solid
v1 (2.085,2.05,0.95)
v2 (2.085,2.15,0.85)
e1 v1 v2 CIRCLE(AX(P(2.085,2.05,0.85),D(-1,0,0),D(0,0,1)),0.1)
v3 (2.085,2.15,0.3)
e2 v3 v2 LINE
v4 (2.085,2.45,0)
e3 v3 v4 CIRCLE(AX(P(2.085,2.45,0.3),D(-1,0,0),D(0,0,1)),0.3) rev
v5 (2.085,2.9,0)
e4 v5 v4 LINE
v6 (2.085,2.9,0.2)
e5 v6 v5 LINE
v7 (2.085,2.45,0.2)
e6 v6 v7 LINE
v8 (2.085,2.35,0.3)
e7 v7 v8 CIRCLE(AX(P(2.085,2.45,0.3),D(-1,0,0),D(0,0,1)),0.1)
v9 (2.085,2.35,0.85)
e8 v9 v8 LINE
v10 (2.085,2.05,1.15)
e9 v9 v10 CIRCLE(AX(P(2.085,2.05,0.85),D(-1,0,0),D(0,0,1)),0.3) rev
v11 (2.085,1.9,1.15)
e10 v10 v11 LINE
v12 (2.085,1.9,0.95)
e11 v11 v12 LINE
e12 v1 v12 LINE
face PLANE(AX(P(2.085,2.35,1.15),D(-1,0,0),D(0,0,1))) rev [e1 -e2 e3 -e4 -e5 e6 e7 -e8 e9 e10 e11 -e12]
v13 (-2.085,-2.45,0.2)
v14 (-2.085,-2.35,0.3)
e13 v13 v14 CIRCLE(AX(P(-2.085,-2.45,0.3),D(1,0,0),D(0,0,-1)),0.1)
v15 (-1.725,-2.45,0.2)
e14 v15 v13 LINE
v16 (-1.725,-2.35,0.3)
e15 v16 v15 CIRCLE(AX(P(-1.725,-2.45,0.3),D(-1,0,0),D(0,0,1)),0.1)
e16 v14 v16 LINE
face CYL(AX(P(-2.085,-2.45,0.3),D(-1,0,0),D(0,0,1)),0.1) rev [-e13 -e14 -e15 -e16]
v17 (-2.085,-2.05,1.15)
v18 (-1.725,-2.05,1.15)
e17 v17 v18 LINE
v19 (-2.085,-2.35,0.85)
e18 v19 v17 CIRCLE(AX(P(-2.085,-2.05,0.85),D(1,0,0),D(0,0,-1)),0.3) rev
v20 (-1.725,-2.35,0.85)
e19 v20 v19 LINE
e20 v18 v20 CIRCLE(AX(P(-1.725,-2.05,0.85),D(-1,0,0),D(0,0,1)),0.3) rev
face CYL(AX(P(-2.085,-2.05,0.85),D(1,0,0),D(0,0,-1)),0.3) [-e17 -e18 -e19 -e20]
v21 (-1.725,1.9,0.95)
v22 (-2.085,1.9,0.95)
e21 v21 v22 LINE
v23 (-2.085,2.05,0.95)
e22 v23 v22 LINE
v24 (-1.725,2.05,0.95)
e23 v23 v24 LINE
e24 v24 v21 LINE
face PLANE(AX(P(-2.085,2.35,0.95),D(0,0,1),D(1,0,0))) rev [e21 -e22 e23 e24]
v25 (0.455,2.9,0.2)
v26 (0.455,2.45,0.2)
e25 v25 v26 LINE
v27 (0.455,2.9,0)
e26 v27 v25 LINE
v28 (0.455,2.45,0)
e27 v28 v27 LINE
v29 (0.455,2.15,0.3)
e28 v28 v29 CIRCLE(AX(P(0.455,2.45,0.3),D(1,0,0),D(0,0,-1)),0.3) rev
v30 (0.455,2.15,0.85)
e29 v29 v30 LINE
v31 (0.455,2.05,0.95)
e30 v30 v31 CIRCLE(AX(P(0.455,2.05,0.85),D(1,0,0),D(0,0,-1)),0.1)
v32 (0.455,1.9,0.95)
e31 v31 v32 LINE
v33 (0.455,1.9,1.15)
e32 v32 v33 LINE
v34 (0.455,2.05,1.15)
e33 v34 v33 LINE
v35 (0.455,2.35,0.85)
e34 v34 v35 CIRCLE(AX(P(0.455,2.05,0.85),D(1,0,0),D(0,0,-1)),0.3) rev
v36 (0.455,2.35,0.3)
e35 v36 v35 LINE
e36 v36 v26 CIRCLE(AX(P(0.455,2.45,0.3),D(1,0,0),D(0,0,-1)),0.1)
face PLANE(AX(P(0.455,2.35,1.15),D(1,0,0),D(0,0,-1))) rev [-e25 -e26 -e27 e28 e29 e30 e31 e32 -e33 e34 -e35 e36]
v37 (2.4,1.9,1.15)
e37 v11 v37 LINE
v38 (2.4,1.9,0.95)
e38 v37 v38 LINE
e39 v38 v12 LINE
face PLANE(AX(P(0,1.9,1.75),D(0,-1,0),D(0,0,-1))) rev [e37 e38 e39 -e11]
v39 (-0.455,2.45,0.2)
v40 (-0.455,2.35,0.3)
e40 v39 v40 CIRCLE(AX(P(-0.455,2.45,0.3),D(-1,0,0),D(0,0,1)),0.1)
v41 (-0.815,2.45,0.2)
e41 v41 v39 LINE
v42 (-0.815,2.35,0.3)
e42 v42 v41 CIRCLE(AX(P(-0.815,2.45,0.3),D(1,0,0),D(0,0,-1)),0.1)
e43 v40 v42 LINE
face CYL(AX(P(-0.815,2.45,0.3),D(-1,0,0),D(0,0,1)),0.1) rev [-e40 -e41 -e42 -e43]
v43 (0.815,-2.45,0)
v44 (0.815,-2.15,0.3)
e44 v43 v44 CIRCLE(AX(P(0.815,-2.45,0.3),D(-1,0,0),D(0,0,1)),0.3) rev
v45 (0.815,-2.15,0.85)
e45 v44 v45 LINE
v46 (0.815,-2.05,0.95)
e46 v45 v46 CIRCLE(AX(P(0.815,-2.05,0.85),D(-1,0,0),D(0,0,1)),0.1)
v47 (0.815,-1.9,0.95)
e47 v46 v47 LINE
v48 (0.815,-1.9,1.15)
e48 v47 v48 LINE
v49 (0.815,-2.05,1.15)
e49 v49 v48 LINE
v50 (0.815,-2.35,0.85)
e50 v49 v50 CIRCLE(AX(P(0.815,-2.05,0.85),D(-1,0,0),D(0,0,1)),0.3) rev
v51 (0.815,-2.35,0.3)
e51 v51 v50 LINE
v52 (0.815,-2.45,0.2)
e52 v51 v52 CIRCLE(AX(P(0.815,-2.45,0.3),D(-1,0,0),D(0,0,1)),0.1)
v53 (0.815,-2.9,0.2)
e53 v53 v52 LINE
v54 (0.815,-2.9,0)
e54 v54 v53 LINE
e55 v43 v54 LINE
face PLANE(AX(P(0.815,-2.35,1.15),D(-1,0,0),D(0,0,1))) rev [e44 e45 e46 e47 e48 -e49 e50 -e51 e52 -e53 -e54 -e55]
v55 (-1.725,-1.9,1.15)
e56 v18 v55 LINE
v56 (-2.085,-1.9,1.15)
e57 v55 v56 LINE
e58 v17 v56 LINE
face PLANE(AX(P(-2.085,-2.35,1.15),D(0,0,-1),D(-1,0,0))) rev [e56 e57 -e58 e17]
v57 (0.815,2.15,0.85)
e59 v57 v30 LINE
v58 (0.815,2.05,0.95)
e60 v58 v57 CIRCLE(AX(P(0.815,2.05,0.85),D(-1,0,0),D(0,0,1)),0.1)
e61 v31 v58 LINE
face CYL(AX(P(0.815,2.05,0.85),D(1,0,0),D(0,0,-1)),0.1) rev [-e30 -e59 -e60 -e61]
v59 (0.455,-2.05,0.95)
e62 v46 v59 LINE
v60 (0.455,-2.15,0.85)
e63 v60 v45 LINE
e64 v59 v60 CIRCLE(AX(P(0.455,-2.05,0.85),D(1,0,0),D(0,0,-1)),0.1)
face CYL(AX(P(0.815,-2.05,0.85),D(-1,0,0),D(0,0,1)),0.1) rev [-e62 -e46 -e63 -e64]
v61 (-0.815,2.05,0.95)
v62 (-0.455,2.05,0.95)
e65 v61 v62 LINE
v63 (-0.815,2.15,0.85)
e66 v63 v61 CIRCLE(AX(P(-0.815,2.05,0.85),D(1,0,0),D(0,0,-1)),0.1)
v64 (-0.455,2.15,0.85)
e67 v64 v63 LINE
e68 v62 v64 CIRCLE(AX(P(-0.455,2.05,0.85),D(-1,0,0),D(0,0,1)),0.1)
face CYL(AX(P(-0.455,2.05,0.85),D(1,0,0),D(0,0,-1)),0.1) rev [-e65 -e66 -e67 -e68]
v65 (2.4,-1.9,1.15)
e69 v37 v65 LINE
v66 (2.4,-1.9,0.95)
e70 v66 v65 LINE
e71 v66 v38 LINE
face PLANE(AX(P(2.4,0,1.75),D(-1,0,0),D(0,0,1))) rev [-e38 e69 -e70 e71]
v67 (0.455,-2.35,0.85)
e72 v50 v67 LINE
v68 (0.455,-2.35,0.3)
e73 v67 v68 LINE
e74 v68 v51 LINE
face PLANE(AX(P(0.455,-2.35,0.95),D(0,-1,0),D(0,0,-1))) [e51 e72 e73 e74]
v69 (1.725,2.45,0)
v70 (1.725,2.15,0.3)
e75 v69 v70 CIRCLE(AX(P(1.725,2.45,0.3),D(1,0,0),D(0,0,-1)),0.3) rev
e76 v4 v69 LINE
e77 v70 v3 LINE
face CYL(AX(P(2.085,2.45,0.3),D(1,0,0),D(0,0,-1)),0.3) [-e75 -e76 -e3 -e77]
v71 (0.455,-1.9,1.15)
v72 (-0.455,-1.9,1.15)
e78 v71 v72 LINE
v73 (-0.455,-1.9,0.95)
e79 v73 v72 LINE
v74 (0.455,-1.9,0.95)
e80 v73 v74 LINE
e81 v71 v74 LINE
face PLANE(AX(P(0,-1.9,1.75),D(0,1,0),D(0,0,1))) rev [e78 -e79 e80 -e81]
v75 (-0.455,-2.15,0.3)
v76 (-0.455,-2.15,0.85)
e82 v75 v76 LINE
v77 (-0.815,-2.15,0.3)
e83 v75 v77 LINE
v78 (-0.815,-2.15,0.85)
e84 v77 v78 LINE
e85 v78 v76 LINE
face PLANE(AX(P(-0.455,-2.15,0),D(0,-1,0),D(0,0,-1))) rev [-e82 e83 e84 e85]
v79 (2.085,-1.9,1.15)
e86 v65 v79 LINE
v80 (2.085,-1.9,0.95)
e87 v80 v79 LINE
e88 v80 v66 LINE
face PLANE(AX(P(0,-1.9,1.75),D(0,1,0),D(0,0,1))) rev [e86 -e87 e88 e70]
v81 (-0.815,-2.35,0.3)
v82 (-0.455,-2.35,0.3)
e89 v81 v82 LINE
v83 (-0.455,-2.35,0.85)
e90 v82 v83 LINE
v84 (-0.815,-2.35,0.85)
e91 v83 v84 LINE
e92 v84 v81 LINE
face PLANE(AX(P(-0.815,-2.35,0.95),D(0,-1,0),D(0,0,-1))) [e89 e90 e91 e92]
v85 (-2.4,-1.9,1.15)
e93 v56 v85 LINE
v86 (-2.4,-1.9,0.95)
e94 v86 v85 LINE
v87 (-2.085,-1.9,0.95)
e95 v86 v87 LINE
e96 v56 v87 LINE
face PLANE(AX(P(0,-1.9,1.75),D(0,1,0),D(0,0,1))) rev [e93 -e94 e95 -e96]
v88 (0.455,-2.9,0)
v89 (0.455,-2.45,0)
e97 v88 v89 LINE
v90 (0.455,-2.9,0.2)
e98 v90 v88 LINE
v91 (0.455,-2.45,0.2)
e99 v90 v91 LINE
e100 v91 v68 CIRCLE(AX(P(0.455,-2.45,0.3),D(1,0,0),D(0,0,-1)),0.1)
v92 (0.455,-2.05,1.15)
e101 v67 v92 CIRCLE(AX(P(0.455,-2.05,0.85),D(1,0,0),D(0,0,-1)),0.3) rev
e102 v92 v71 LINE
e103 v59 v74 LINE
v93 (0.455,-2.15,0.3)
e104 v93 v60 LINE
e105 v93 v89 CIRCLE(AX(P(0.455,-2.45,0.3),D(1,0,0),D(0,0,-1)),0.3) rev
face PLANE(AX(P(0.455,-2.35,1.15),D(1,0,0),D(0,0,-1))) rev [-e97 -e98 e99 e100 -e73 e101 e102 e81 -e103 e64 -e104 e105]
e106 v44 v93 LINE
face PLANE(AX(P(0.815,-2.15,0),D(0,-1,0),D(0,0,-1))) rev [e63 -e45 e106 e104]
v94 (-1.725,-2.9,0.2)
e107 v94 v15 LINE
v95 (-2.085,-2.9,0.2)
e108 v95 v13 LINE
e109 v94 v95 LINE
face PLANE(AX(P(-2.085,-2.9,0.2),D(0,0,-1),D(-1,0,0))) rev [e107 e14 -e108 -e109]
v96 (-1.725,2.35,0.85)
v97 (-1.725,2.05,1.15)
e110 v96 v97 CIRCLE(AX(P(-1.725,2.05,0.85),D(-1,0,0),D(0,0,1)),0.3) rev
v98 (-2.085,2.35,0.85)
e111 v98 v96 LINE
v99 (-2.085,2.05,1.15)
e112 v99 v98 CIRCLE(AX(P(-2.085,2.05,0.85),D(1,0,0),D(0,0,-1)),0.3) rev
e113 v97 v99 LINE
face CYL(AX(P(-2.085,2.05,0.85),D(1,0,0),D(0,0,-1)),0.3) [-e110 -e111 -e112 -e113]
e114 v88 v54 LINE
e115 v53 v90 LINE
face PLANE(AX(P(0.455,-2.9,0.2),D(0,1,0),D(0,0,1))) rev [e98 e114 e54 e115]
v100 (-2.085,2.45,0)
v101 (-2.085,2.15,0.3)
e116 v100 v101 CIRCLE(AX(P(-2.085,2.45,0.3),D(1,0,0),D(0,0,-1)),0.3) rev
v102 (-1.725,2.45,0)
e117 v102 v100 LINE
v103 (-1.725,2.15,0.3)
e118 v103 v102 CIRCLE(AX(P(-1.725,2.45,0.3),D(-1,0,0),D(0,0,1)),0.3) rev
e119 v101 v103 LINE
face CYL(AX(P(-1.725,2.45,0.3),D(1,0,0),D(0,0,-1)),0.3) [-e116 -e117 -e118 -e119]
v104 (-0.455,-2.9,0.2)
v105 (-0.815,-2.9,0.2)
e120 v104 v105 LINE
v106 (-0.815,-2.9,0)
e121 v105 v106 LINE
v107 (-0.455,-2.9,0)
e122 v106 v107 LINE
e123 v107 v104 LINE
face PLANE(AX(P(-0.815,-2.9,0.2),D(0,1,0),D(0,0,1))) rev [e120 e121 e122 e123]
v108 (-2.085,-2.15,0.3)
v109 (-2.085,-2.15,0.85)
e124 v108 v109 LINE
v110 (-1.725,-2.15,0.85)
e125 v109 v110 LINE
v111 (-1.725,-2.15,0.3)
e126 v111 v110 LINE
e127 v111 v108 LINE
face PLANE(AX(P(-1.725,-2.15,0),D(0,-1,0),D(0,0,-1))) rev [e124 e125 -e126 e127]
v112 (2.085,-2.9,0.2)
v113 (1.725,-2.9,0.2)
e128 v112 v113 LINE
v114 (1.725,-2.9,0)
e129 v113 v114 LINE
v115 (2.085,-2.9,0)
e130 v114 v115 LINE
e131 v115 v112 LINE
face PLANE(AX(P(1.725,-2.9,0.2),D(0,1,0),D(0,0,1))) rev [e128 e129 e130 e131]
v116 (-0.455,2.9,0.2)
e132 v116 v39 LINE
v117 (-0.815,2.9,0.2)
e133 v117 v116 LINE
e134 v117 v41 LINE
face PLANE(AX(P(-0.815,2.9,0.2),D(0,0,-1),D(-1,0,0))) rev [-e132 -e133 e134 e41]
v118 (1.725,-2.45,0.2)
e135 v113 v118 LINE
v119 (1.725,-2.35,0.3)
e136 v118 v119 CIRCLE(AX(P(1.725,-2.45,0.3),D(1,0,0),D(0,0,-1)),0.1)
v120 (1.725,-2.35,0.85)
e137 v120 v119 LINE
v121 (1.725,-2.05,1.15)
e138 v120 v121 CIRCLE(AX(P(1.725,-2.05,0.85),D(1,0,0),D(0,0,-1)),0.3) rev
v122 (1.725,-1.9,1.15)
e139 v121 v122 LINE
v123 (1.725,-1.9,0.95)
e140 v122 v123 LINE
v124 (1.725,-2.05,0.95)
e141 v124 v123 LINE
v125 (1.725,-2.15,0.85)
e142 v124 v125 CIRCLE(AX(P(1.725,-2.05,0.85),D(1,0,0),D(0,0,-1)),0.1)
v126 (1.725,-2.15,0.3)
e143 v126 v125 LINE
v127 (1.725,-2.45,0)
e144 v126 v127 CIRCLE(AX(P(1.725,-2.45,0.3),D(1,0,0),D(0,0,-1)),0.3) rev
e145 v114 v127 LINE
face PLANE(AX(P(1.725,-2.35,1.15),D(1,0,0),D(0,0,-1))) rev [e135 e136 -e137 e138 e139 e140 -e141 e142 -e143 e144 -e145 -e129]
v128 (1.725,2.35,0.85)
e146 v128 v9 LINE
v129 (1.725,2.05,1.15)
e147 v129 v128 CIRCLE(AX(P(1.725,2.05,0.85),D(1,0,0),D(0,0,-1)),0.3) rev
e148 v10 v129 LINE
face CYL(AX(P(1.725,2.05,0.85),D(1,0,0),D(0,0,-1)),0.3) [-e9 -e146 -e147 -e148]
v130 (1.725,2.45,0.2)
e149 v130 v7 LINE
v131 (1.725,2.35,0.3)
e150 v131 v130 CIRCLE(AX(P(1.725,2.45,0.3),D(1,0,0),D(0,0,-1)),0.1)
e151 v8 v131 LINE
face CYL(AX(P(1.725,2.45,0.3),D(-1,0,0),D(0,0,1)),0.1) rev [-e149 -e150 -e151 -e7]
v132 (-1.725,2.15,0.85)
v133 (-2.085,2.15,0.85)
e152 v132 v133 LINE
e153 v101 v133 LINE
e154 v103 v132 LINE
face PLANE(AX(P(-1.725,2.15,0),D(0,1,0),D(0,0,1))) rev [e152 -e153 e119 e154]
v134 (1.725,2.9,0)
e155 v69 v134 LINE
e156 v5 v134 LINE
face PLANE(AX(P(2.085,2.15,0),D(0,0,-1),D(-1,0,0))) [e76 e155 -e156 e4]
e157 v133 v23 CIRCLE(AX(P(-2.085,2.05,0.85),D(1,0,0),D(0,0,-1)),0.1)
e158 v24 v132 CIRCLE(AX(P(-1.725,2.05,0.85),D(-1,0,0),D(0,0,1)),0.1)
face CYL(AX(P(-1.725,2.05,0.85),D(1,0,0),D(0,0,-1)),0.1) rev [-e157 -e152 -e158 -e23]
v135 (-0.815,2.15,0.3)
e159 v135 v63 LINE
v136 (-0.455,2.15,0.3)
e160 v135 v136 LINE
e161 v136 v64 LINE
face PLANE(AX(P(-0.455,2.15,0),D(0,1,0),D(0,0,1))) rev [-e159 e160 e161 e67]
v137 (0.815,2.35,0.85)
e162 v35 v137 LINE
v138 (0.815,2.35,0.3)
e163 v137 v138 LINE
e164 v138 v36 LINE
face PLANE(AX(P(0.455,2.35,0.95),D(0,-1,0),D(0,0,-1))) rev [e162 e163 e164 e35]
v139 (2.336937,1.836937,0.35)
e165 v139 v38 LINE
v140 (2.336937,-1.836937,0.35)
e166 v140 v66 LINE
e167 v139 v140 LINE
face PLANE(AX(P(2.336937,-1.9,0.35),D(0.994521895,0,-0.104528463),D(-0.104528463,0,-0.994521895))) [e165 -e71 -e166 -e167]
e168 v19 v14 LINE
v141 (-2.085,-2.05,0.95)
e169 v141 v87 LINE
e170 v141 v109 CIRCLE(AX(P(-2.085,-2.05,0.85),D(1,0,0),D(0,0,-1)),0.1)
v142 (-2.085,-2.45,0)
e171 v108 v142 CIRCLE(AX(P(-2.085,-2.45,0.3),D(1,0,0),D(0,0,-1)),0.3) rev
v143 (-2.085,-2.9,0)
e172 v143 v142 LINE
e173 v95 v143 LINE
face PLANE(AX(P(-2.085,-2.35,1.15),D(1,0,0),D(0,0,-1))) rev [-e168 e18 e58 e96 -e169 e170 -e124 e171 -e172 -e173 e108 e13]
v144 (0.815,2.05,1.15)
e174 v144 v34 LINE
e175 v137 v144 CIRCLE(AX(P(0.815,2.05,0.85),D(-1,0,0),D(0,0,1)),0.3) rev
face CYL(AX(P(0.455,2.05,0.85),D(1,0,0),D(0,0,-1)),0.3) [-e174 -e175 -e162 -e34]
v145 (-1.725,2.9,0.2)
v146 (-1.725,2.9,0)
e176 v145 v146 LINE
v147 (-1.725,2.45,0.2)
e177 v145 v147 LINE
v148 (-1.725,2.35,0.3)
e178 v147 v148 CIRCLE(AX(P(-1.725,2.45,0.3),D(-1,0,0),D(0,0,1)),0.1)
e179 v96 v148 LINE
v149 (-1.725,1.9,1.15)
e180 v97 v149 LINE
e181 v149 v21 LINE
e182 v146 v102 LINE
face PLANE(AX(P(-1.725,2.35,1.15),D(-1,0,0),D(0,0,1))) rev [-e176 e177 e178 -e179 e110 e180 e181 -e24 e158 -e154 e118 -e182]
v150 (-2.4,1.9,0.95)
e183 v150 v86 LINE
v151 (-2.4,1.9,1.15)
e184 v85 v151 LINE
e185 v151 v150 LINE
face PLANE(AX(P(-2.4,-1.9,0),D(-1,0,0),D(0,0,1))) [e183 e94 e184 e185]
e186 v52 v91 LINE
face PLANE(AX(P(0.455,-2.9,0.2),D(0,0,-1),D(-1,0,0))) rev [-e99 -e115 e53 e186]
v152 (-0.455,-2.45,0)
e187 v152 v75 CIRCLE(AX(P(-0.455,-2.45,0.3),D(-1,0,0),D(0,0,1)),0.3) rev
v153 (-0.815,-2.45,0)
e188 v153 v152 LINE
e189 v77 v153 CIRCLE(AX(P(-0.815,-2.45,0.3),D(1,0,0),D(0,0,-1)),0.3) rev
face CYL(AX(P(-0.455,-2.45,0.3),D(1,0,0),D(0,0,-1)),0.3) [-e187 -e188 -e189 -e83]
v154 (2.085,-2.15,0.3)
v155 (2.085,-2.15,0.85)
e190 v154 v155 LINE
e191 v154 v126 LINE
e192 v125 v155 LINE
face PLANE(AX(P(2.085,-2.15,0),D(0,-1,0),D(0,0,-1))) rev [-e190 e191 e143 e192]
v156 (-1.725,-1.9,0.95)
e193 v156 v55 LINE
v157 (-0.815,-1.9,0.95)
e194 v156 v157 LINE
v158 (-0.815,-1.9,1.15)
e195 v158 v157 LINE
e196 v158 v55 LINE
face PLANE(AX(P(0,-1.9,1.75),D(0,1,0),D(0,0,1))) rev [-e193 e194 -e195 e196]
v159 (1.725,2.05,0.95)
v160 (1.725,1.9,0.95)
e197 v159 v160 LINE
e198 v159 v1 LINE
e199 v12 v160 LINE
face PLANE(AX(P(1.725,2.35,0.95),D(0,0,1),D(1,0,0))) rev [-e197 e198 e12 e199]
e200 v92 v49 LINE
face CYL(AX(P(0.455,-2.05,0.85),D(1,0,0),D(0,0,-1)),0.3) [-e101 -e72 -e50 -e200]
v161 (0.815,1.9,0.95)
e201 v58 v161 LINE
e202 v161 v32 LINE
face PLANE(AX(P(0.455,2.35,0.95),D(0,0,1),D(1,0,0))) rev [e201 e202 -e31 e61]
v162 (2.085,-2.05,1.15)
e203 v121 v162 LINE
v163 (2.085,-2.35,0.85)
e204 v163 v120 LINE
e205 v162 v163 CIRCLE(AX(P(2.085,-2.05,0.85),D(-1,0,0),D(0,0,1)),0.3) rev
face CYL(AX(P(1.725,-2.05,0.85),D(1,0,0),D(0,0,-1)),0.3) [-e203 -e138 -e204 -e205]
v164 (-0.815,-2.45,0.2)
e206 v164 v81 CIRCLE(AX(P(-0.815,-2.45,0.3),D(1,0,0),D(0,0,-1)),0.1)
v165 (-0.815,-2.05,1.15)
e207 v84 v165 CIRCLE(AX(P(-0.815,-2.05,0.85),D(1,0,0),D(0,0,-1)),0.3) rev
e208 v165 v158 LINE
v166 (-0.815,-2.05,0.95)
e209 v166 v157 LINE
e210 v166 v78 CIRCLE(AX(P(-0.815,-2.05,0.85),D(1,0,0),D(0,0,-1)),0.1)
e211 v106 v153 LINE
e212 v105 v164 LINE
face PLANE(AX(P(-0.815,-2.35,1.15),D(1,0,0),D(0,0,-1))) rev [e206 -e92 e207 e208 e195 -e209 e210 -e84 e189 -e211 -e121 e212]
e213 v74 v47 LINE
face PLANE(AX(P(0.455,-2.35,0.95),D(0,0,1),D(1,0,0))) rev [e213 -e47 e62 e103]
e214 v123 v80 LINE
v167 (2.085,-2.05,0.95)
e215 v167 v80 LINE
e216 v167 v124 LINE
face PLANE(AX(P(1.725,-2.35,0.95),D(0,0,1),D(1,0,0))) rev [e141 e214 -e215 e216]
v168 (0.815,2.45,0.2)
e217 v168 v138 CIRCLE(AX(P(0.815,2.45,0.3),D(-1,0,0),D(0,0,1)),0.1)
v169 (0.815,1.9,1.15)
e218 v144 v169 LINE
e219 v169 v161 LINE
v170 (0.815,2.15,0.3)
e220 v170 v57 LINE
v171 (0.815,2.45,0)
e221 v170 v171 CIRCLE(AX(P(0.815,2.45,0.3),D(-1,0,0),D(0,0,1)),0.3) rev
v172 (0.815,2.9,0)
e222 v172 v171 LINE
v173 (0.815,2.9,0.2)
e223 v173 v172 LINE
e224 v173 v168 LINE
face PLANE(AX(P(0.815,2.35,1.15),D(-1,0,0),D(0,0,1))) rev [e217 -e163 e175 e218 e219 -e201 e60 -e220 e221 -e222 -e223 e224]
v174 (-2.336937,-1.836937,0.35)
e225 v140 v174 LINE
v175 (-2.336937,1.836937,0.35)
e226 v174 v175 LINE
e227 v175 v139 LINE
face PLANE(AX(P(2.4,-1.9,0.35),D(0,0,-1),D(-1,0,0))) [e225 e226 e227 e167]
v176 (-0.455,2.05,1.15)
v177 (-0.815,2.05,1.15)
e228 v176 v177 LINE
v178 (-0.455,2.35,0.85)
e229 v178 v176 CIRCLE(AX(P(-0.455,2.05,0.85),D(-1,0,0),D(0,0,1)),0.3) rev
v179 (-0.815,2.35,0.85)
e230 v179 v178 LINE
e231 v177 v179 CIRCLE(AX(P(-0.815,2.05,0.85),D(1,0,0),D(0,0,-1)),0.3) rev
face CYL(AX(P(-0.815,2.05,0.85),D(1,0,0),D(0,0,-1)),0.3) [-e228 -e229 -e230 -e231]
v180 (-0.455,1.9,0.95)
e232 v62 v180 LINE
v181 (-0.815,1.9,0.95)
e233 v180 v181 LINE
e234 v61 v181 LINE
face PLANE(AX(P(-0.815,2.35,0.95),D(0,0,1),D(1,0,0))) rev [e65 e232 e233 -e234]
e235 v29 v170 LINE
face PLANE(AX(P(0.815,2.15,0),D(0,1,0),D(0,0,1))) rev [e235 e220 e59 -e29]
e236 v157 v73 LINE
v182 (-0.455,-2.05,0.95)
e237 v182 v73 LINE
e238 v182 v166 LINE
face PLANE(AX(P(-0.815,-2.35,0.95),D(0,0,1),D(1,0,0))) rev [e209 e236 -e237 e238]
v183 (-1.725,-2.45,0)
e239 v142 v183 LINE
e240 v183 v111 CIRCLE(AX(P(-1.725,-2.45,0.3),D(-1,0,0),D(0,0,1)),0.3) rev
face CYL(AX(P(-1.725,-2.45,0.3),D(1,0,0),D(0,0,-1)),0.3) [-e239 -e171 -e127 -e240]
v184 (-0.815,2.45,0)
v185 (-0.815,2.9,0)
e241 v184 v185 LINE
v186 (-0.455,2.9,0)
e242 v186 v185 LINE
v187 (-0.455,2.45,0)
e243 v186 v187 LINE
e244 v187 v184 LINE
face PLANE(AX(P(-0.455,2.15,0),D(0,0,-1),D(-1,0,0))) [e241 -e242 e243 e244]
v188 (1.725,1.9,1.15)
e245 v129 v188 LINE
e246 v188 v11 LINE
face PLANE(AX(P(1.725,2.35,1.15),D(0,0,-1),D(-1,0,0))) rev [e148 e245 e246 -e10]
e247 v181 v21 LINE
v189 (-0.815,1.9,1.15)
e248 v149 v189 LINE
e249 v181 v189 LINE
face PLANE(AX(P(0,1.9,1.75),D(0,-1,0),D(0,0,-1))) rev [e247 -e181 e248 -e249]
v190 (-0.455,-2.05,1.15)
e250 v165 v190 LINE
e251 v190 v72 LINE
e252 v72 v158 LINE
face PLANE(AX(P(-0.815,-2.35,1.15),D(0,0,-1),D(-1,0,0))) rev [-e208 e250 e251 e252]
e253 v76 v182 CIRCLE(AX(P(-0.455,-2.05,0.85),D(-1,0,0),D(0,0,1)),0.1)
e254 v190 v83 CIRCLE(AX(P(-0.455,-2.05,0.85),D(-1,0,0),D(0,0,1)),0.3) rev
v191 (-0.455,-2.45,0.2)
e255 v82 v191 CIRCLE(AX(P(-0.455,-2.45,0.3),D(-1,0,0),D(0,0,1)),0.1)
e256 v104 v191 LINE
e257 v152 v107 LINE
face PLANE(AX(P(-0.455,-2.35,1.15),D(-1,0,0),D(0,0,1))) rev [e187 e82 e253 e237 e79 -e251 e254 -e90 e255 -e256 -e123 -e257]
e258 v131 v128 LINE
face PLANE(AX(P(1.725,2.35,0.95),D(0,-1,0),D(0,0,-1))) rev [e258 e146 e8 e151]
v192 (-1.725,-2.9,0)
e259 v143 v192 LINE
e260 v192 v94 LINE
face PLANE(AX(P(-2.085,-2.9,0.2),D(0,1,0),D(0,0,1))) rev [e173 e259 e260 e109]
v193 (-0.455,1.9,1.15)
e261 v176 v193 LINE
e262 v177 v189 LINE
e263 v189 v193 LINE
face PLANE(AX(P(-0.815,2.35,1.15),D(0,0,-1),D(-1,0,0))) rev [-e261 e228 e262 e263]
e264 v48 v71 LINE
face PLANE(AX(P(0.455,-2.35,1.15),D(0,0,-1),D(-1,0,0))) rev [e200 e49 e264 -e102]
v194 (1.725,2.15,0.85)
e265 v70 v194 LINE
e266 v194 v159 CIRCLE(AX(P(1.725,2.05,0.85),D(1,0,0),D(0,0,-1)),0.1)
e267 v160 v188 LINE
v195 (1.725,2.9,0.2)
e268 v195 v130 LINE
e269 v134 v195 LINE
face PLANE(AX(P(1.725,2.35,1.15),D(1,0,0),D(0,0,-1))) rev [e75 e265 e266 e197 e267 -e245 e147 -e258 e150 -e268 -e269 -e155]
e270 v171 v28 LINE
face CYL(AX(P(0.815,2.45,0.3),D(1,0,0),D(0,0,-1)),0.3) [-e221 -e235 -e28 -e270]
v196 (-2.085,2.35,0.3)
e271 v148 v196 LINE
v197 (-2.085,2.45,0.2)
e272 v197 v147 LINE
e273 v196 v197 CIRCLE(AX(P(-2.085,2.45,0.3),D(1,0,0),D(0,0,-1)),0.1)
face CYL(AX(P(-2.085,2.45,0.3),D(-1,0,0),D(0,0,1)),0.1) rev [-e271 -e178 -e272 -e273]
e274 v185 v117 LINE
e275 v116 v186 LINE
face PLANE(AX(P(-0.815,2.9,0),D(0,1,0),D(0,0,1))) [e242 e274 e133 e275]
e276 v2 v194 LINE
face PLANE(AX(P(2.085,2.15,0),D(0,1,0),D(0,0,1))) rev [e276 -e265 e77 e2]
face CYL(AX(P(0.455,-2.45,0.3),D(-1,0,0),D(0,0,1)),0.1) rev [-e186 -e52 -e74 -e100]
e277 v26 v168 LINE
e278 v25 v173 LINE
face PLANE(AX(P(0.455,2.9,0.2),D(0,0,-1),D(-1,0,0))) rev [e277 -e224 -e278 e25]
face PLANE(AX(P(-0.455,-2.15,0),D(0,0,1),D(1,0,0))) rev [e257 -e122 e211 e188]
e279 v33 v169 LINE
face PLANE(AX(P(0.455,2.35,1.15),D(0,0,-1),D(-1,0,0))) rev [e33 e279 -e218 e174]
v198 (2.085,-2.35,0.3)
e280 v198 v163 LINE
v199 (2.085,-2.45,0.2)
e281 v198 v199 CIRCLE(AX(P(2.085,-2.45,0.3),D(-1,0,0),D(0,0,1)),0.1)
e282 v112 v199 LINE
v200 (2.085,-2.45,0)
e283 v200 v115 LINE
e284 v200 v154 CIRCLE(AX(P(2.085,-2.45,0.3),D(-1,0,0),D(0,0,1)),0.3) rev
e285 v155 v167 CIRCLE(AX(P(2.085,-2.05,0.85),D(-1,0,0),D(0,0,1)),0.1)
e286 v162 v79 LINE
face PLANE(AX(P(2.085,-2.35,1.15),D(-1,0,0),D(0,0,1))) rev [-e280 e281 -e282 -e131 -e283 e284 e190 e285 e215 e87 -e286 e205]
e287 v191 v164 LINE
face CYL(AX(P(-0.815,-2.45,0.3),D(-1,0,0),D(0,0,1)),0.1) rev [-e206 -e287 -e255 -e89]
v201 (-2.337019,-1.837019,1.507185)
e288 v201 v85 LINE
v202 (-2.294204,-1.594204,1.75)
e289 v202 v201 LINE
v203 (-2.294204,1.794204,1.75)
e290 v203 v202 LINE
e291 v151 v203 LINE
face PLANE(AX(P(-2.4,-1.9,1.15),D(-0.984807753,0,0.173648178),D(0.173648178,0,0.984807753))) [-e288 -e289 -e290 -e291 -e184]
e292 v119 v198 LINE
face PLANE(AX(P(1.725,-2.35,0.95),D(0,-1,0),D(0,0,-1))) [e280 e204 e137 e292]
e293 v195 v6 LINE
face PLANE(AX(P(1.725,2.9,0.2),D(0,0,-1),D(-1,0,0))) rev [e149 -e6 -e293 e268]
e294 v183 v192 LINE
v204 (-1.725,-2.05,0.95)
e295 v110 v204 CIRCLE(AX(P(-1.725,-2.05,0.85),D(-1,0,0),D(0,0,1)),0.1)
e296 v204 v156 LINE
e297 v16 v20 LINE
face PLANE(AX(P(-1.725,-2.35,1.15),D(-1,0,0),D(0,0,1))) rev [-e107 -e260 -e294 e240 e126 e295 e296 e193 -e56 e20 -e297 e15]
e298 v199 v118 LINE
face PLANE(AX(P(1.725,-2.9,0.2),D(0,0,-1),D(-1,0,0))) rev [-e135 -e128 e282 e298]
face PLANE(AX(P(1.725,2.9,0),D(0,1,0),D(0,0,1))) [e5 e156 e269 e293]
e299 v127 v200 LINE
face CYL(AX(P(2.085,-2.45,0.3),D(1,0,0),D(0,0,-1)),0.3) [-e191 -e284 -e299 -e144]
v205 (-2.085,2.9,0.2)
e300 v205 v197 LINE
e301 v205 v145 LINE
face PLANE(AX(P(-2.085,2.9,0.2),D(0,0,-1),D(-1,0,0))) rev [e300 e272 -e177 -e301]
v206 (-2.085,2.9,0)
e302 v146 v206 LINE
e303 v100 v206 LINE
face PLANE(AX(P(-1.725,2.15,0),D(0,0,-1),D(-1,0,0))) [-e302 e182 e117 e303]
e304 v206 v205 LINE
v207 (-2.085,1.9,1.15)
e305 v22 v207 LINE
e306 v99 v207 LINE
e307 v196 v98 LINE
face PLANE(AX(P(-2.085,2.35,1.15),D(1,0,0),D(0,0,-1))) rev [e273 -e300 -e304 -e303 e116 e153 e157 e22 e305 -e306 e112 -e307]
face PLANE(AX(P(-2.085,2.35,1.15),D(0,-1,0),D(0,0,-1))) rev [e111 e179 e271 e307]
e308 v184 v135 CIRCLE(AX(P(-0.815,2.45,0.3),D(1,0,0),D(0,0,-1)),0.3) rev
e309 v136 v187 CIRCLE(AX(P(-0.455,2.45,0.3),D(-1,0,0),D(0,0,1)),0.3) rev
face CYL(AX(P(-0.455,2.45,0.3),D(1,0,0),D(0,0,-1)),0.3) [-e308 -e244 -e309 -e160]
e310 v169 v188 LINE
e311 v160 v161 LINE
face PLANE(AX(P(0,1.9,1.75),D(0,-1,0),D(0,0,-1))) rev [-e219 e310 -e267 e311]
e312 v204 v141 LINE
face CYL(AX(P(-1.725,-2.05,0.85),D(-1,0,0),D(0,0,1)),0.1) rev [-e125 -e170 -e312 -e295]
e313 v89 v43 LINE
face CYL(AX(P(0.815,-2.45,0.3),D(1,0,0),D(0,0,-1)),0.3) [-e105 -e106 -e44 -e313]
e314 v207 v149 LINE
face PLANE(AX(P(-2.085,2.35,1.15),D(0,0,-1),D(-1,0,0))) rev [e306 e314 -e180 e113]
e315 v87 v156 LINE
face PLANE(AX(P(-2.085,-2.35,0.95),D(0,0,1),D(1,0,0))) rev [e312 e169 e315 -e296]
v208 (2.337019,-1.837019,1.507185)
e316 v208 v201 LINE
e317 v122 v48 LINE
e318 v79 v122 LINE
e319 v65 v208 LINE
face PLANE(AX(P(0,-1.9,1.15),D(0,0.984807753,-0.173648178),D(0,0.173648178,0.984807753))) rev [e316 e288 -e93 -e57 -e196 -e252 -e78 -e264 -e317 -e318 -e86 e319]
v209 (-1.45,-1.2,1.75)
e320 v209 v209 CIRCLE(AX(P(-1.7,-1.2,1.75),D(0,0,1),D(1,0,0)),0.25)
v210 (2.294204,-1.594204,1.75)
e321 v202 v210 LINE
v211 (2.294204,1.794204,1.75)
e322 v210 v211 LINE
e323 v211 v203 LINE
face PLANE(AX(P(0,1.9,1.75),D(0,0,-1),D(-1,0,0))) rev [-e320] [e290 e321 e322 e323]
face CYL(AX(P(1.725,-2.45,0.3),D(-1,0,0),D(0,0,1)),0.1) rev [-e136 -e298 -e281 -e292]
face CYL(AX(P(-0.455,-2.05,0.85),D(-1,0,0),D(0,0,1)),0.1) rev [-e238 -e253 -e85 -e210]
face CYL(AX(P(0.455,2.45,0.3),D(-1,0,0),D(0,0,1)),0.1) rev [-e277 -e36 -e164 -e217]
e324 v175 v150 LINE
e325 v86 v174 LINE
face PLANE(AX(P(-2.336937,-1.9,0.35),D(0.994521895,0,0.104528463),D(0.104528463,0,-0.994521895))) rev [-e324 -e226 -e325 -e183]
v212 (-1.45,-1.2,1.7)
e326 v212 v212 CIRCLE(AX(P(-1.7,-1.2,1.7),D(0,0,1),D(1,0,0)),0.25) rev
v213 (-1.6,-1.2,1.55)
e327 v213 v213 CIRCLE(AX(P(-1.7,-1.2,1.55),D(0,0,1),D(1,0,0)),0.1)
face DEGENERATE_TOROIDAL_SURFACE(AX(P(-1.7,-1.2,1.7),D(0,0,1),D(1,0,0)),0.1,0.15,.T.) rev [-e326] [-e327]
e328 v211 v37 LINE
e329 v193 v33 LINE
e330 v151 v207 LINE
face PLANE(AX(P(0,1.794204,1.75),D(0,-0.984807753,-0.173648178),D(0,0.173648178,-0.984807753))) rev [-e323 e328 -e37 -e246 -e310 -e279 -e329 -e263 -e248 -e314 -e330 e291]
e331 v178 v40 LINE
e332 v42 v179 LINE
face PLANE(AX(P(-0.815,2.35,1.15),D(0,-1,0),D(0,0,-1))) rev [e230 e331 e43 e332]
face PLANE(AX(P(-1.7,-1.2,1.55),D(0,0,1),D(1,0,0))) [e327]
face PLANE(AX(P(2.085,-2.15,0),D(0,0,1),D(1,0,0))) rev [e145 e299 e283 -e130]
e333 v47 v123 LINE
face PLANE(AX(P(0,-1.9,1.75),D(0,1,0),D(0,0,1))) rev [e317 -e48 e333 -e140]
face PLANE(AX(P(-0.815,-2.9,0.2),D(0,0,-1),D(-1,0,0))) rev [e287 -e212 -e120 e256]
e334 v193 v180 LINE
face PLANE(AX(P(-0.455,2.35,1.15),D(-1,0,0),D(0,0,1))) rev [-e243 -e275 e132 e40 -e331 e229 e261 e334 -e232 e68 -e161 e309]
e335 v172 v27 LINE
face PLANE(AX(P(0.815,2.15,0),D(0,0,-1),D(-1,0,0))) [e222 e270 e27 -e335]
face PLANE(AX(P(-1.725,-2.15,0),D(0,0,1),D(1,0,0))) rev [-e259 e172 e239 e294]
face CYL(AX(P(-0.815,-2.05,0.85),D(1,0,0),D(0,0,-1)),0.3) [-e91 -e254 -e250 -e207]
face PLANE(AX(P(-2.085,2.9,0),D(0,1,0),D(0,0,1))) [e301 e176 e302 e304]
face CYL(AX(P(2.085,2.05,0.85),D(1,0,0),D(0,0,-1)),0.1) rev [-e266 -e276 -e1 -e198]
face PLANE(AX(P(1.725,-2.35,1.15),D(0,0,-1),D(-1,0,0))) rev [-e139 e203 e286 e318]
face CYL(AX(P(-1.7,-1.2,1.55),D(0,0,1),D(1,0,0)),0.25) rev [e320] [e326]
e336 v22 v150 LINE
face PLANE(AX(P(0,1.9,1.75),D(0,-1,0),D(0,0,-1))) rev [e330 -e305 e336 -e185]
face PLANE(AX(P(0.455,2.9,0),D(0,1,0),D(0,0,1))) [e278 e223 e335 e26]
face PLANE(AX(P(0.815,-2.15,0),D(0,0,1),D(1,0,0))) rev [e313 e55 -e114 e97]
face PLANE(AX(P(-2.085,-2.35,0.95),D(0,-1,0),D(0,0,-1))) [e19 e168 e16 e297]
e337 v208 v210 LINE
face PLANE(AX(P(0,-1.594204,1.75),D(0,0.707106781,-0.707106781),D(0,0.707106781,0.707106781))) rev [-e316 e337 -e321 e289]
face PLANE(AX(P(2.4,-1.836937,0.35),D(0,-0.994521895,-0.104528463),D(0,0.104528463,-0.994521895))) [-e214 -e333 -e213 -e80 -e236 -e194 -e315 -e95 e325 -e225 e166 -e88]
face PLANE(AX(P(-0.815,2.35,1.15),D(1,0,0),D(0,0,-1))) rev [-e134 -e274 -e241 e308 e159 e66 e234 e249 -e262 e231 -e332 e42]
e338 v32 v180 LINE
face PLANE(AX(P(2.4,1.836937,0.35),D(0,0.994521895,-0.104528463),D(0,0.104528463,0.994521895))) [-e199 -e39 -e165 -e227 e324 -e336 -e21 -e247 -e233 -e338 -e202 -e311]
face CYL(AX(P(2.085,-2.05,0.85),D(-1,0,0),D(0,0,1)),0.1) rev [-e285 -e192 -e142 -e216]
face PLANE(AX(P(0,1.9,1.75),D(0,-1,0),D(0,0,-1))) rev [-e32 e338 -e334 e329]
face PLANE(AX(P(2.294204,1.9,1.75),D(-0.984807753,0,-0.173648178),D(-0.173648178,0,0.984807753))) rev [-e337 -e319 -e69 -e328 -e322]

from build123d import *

# Parameters (mm, degrees)
SZKIC1_W                   = 2.4
SZKIC1_H                   = 1.9
WYCI_GNI_CIE1_DEPTH        = 1.75
SZKIC2_W                   = 2.4
SZKIC2_H                   = 1.75
WYCI_GNI_CIE2_DEPTH        = 1.9
SZKIC3_W                   = 1.75
SZKIC3_H                   = 3.8
WYCI_GNI_CIE3_DEPTH        = 2.4
SFAZOWANIE1_SIZE           = 0.6
SFAZOWANIE1_SIZE2          = 0.105796188
SFAZOWANIE3_SIZE           = 0.2
SFAZOWANIE3_SIZE2          = 0.24656061
SFAZOWANIE4_SIZE           = 0.6
SFAZOWANIE4_SIZE2          = 0.105796188
SZKIC4_W                   = 0.36
SZKIC4_H                   = 0.2
WYCI_GNI_CIE4_DEPTH        = 0.45
SZKIC6_W                   = 0.36
SZKIC6_H                   = 0.2
WYCI_GNI_CIE5_DEPTH        = 0.95
SZKIC10_W                  = 0.36
SZKIC10_H                  = 0.2
WYCI_GNI_CIE6_DEPTH        = 0.45
SZKIC11_W                  = 0.36
SZKIC11_H                  = 0.2
WYCI_GNI_CIE7_DEPTH        = 0.95
SZKIC12_W                  = 4.8
SZKIC12_H                  = 3.8
WYTNIJ_WYCI_GNI_CIE3_DEPTH = 0.35
SFAZOWANIE6_SIZE           = 0.6
SFAZOWANIE6_SIZE_2         = 0.063062541
SFAZOWANIE7_SIZE           = 0.6
SFAZOWANIE7_SIZE2          = 0.063062541
SFAZOWANIE8_SIZE           = 0.6
SFAZOWANIE8_SIZE_2         = 0.063062541
SFAZOWANIE9_SIZE           = 0.6
SFAZOWANIE9_SIZE2          = 0.063062541
SFAZOWANIE10_SIZE          = 0.6
SFAZOWANIE10_SIZE2         = 0.105796188
SFAZOWANIE11_SIZE          = 0.6
SFAZOWANIE11_SIZE2         = 0.105796188
SZKIC13_W                  = 0.36
SZKIC13_H                  = 0.2
WYCI_GNI_CIE8_DEPTH        = 0.55
SZKIC14_W                  = 0.36
SZKIC14_H                  = 0.2
WYCI_GNI_CIE9_DEPTH        = 0.55
ZAOKR_GLENIE1_R            = 0.3
ZAOKR_GLENIE2_R            = 0.3
ZAOKR_GLENIE3_R            = 0.3
ZAOKR_GLENIE4_R            = 0.3
ZAOKR_GLENIE5_R            = 0.1
ZAOKR_GLENIE6_R            = 0.3
ZAOKR_GLENIE7_R            = 0.3
ZAOKR_GLENIE8_R            = 0.3
ZAOKR_GLENIE9_R            = 0.3
ZAOKR_GLENIE10_R           = 0.3
ZAOKR_GLENIE11_R           = 0.3
ZAOKR_GLENIE12_R           = 0.3
ZAOKR_GLENIE13_R           = 0.3
ZAOKR_GLENIE14_R           = 0.3
ZAOKR_GLENIE15_R           = 0.3
ZAOKR_GLENIE16_R           = 0.3
ZAOKR_GLENIE17_R           = 0.3
ZAOKR_GLENIE18_R           = 0.1
ZAOKR_GLENIE19_R           = 0.1
ZAOKR_GLENIE20_R           = 0.1
ZAOKR_GLENIE21_R           = 0.1
ZAOKR_GLENIE22_R           = 0.1
ZAOKR_GLENIE23_R           = 0.1
ZAOKR_GLENIE24_R           = 0.1
ZAOKR_GLENIE25_R           = 0.1
ZAOKR_GLENIE26_R           = 0.1
ZAOKR_GLENIE27_R           = 0.1
ZAOKR_GLENIE28_R           = 0.1
ZAOKR_GLENIE29_R           = 0.1
ZAOKR_GLENIE30_R           = 0.1
ZAOKR_GLENIE31_R           = 0.1
ZAOKR_GLENIE32_R           = 0.1
SZKIC15_R                  = 0.25
WYTNIJ_WYCI_GNI_CIE4_DEPTH = 0.2
ZAOKR_GLENIE33_R           = 0.15


with BuildPart() as part:
    # Szkic1 → Wyciągnięcie1 (new body)
    with BuildSketch(Plane.XY):
        with Locations((1.2, 0.95)):
            Rectangle(SZKIC1_W, SZKIC1_H)
    extrude(amount=WYCI_GNI_CIE1_DEPTH)

    # Szkic2 → Wyciągnięcie2 (add)
    with BuildSketch(Plane.XZ):
        with Locations((1.2, 0.875)):
            Rectangle(SZKIC2_W, SZKIC2_H)
    extrude(amount=WYCI_GNI_CIE2_DEPTH)

    # Szkic3 → Wyciągnięcie3 (add)
    with BuildSketch(Plane.ZY):
        with Locations((0.875, 0)):
            Rectangle(SZKIC3_W, SZKIC3_H)
    extrude(amount=WYCI_GNI_CIE3_DEPTH)

    # Sfazowanie1
    sfazowanie1_edges = [part.edges().sort_by_distance(p)[0] for p in [
        (0, -1.9, 1.75),
    ]]
    sfazowanie1_side = [part.faces().sort_by_distance(p)[0] for p in [
        (0, -1.9, 0.875),
    ]]
    chamfer(sfazowanie1_edges, length=SFAZOWANIE1_SIZE, length2=SFAZOWANIE1_SIZE2, reference=sfazowanie1_side[0])

    # Sfazowanie3
    sfazowanie3_edges = [part.edges().sort_by_distance(p)[0] for p in [
        (0, -1.794203812, 1.75),
    ]]
    sfazowanie3_side = [part.faces().sort_by_distance(p)[0] for p in [
        (0, 0.052898094, 1.75),
    ]]
    chamfer(sfazowanie3_edges, length=SFAZOWANIE3_SIZE, length2=SFAZOWANIE3_SIZE2, reference=sfazowanie3_side[0])

    # Sfazowanie4
    sfazowanie4_edges = [part.edges().sort_by_distance(p)[0] for p in [
        (0, 1.9, 1.75),
    ]]
    sfazowanie4_side = [part.faces().sort_by_distance(p)[0] for p in [
        (0, 1.9, 0.875),
    ]]
    chamfer(sfazowanie4_edges, length=SFAZOWANIE4_SIZE, length2=SFAZOWANIE4_SIZE2, reference=sfazowanie4_side[0])

    # Szkic4 → Wyciągnięcie4 (add)
    with BuildSketch(Plane.XZ.offset(1.9)):
        with Locations((-1.905, 1.05)):
            Rectangle(SZKIC4_W, SZKIC4_H)
        with Locations((-0.635, 1.05)):
            Rectangle(SZKIC4_W, SZKIC4_H)
        with Locations((0.635, 1.05)):
            Rectangle(SZKIC4_W, SZKIC4_H)
        with Locations((1.905, 1.05)):
            Rectangle(SZKIC4_W, SZKIC4_H)
    extrude(amount=WYCI_GNI_CIE4_DEPTH)

    # Szkic6 → Wyciągnięcie5 (add)
    with BuildSketch(Plane(origin=(0, 0, 0.95), x_dir=(-1, 0, 0), z_dir=(0, 0, -1))):
        with Locations((-1.905, -2.25)):
            Rectangle(SZKIC6_W, SZKIC6_H)
        with Locations((-0.635, -2.25)):
            Rectangle(SZKIC6_W, SZKIC6_H)
        with Locations((0.635, -2.25)):
            Rectangle(SZKIC6_W, SZKIC6_H)
        with Locations((1.905, -2.25)):
            Rectangle(SZKIC6_W, SZKIC6_H)
    extrude(amount=WYCI_GNI_CIE5_DEPTH)

    # Szkic10 → Wyciągnięcie6 (add)
    with BuildSketch(Plane(origin=(0, 1.9, 0), x_dir=(-1, 0, 0), z_dir=(0, 1, 0))):
        with Locations((1.905, 1.05)):
            Rectangle(SZKIC10_W, SZKIC10_H)
        with Locations((0.635, 1.05)):
            Rectangle(SZKIC10_W, SZKIC10_H)
        with Locations((-0.635, 1.05)):
            Rectangle(SZKIC10_W, SZKIC10_H)
        with Locations((-1.905, 1.05)):
            Rectangle(SZKIC10_W, SZKIC10_H)
    extrude(amount=WYCI_GNI_CIE6_DEPTH)

    # Szkic11 → Wyciągnięcie7 (add)
    with BuildSketch(Plane(origin=(0, 0, 0.95), x_dir=(-1, 0, 0), z_dir=(0, 0, -1))):
        with Locations((-1.905, 2.25)):
            Rectangle(SZKIC11_W, SZKIC11_H)
        with Locations((-0.635, 2.25)):
            Rectangle(SZKIC11_W, SZKIC11_H)
        with Locations((0.635, 2.25)):
            Rectangle(SZKIC11_W, SZKIC11_H)
        with Locations((1.905, 2.25)):
            Rectangle(SZKIC11_W, SZKIC11_H)
    extrude(amount=WYCI_GNI_CIE7_DEPTH)

    # Szkic12 → Wytnij-wyciągnięcie3 (cut)
    with BuildSketch(Plane(origin=(0, 0, 0), x_dir=(-1, 0, 0), z_dir=(0, 0, -1))):
        Rectangle(SZKIC12_W, SZKIC12_H)
    extrude(amount=-WYTNIJ_WYCI_GNI_CIE3_DEPTH, mode=Mode.SUBTRACT)

    # Sfazowanie6
    # the kernel refuses this chamfer: 0.6, 0.063062541 mm, written as the material it takes off along each edge
    with BuildSketch(Plane(origin=(-3.959683923, -1.9, 0.35), x_dir=(0, -0.00402114024619829, 0.999991915182878), z_dir=(1, 0, 0))) as sfazowanie6_piece_1:
        Polygon((SFAZOWANIE6_SIZE * 0.999991915183, -SFAZOWANIE6_SIZE * 0.0040211402462), (-SFAZOWANIE6_SIZE_2 * 0.00402114025636, -SFAZOWANIE6_SIZE_2 * 0.999991917711), (0, 0), align=None)
    extrude(amount=7.919367847, mode=Mode.SUBTRACT)

    # Sfazowanie7
    sfazowanie7_edges = [part.edges().sort_by_distance(p)[0] for p in [
        (2.4, 0.031531271, 0.35),
    ]]
    sfazowanie7_side = [part.faces().sort_by_distance(p)[0] for p in [
        (2.4, 0.014931296, 1.042843103),
    ]]
    chamfer(sfazowanie7_edges, length=SFAZOWANIE7_SIZE, length2=SFAZOWANIE7_SIZE2, reference=sfazowanie7_side[0])

    # Sfazowanie8
    # the kernel refuses this chamfer: 0.6, 0.063062541 mm, written as the material it takes off along each edge
    with BuildSketch(Plane(origin=(3.896621382, 1.9, 0.35), x_dir=(0, 0.00402114024619829, 0.999991915182878), z_dir=(-1, 0, 0))) as sfazowanie8_piece_1:
        Polygon((SFAZOWANIE8_SIZE * 0.999991915183, -SFAZOWANIE8_SIZE * 0.0040211402462), (-SFAZOWANIE8_SIZE_2 * 0.00402114025636, -SFAZOWANIE8_SIZE_2 * 0.999991917711), (0, 0), align=None)
    extrude(amount=7.856305306, mode=Mode.SUBTRACT)

    # Sfazowanie9
    sfazowanie9_edges = [part.edges().sort_by_distance(p)[0] for p in [
        (-2.4, 0, 0.35),
    ]]
    sfazowanie9_side = [part.faces().sort_by_distance(p)[0] for p in [
        (-2.4, 0.008142166, 1.044638108),
    ]]
    chamfer(sfazowanie9_edges, length=SFAZOWANIE9_SIZE, length2=SFAZOWANIE9_SIZE2, reference=sfazowanie9_side[0])

    # Sfazowanie10
    sfazowanie10_edges = [part.edges().sort_by_distance(p)[0] for p in [
        (-2.4, 0.1, 1.75),
    ]]
    sfazowanie10_side = [part.faces().sort_by_distance(p)[0] for p in [
        (-2.4, 0.014325964, 1.343075486),
    ]]
    chamfer(sfazowanie10_edges, length=SFAZOWANIE10_SIZE, length2=SFAZOWANIE10_SIZE2, reference=sfazowanie10_side[0])

    # Sfazowanie11
    sfazowanie11_edges = [part.edges().sort_by_distance(p)[0] for p in [
        (2.4, 0.1, 1.75),
    ]]
    sfazowanie11_side = [part.faces().sort_by_distance(p)[0] for p in [
        (2.4, 0.014325964, 1.343075486),
    ]]
    chamfer(sfazowanie11_edges, length=SFAZOWANIE11_SIZE, length2=SFAZOWANIE11_SIZE2, reference=sfazowanie11_side[0])

    # Szkic13 → Wyciągnięcie8 (add)
    with BuildSketch(Plane(origin=(0, 2.35, 0), x_dir=(-1, 0, 0), z_dir=(0, 1, 0))):
        with Locations((1.905, 0.1)):
            Rectangle(SZKIC13_W, SZKIC13_H)
        with Locations((0.635, 0.1)):
            Rectangle(SZKIC13_W, SZKIC13_H)
        with Locations((-0.635, 0.1)):
            Rectangle(SZKIC13_W, SZKIC13_H)
        with Locations((-1.905, 0.1)):
            Rectangle(SZKIC13_W, SZKIC13_H)
    extrude(amount=WYCI_GNI_CIE8_DEPTH)

    # Szkic14 → Wyciągnięcie9 (add)
    with BuildSketch(Plane.XZ.offset(2.35)):
        with Locations((-1.905, 0.1)):
            Rectangle(SZKIC14_W, SZKIC14_H)
        with Locations((-0.635, 0.1)):
            Rectangle(SZKIC14_W, SZKIC14_H)
        with Locations((0.635, 0.1)):
            Rectangle(SZKIC14_W, SZKIC14_H)
        with Locations((1.905, 0.1)):
            Rectangle(SZKIC14_W, SZKIC14_H)
    extrude(amount=WYCI_GNI_CIE9_DEPTH)

    # Zaokrąglenie1
    zaokr_glenie1_edges = [part.edges().sort_by_distance(p)[0] for p in [
        (-1.905, -2.35, 1.15),
    ]]
    fillet(zaokr_glenie1_edges, radius=ZAOKR_GLENIE1_R)

    # Zaokrąglenie2
    zaokr_glenie2_edges = [part.edges().sort_by_distance(p)[0] for p in [
        (-0.635, -2.35, 1.15),
    ]]
    fillet(zaokr_glenie2_edges, radius=ZAOKR_GLENIE2_R)

    # Zaokrąglenie3
    zaokr_glenie3_edges = [part.edges().sort_by_distance(p)[0] for p in [
        (0.635, -2.35, 1.15),
    ]]
    fillet(zaokr_glenie3_edges, radius=ZAOKR_GLENIE3_R)

    # Zaokrąglenie4
    zaokr_glenie4_edges = [part.edges().sort_by_distance(p)[0] for p in [
        (1.905, -2.35, 1.15),
    ]]
    fillet(zaokr_glenie4_edges, radius=ZAOKR_GLENIE4_R)

    # Zaokrąglenie5
    zaokr_glenie5_edges = [part.edges().sort_by_distance(p)[0] for p in [
        (-1.905, -2.15, 0.95),
    ]]
    fillet(zaokr_glenie5_edges, radius=ZAOKR_GLENIE5_R)

    # Zaokrąglenie6
    zaokr_glenie6_edges = [part.edges().sort_by_distance(p)[0] for p in [
        (1.905, -2.15, 0),
    ]]
    fillet(zaokr_glenie6_edges, radius=ZAOKR_GLENIE6_R)

    # Zaokrąglenie7
    zaokr_glenie7_edges = [part.edges().sort_by_distance(p)[0] for p in [
        (0.635, -2.15, 0),
    ]]
    fillet(zaokr_glenie7_edges, radius=ZAOKR_GLENIE7_R)

    # Zaokrąglenie8
    zaokr_glenie8_edges = [part.edges().sort_by_distance(p)[0] for p in [
        (-0.635, -2.15, 0),
    ]]
    fillet(zaokr_glenie8_edges, radius=ZAOKR_GLENIE8_R)

    # Zaokrąglenie9
    zaokr_glenie9_edges = [part.edges().sort_by_distance(p)[0] for p in [
        (-1.905, -2.15, 0),
    ]]
    fillet(zaokr_glenie9_edges, radius=ZAOKR_GLENIE9_R)

    # Zaokrąglenie10
    zaokr_glenie10_edges = [part.edges().sort_by_distance(p)[0] for p in [
        (1.905, 2.35, 1.15),
    ]]
    fillet(zaokr_glenie10_edges, radius=ZAOKR_GLENIE10_R)

    # Zaokrąglenie11
    zaokr_glenie11_edges = [part.edges().sort_by_distance(p)[0] for p in [
        (0.635, 2.35, 1.15),
    ]]
    fillet(zaokr_glenie11_edges, radius=ZAOKR_GLENIE11_R)

    # Zaokrąglenie12
    zaokr_glenie12_edges = [part.edges().sort_by_distance(p)[0] for p in [
        (-0.635, 2.35, 1.15),
    ]]
    fillet(zaokr_glenie12_edges, radius=ZAOKR_GLENIE12_R)

    # Zaokrąglenie13
    zaokr_glenie13_edges = [part.edges().sort_by_distance(p)[0] for p in [
        (-1.905, 2.35, 1.15),
    ]]
    fillet(zaokr_glenie13_edges, radius=ZAOKR_GLENIE13_R)

    # Zaokrąglenie14
    zaokr_glenie14_edges = [part.edges().sort_by_distance(p)[0] for p in [
        (-1.905, 2.15, 0),
    ]]
    fillet(zaokr_glenie14_edges, radius=ZAOKR_GLENIE14_R)

    # Zaokrąglenie15
    zaokr_glenie15_edges = [part.edges().sort_by_distance(p)[0] for p in [
        (-0.635, 2.15, 0),
    ]]
    fillet(zaokr_glenie15_edges, radius=ZAOKR_GLENIE15_R)

    # Zaokrąglenie16
    zaokr_glenie16_edges = [part.edges().sort_by_distance(p)[0] for p in [
        (0.635, 2.15, 0),
    ]]
    fillet(zaokr_glenie16_edges, radius=ZAOKR_GLENIE16_R)

    # Zaokrąglenie17
    zaokr_glenie17_edges = [part.edges().sort_by_distance(p)[0] for p in [
        (1.905, 2.15, 0),
    ]]
    fillet(zaokr_glenie17_edges, radius=ZAOKR_GLENIE17_R)

    # Zaokrąglenie18
    zaokr_glenie18_edges = [part.edges().sort_by_distance(p)[0] for p in [
        (-1.905, -2.35, 0.2),
    ]]
    fillet(zaokr_glenie18_edges, radius=ZAOKR_GLENIE18_R)

    # Zaokrąglenie19
    zaokr_glenie19_edges = [part.edges().sort_by_distance(p)[0] for p in [
        (-0.635, -2.35, 0.2),
    ]]
    fillet(zaokr_glenie19_edges, radius=ZAOKR_GLENIE19_R)

    # Zaokrąglenie20
    zaokr_glenie20_edges = [part.edges().sort_by_distance(p)[0] for p in [
        (0.635, -2.35, 0.2),
    ]]
    fillet(zaokr_glenie20_edges, radius=ZAOKR_GLENIE20_R)

    # Zaokrąglenie21
    zaokr_glenie21_edges = [part.edges().sort_by_distance(p)[0] for p in [
        (1.905, -2.35, 0.2),
    ]]
    fillet(zaokr_glenie21_edges, radius=ZAOKR_GLENIE21_R)

    # Zaokrąglenie22
    zaokr_glenie22_edges = [part.edges().sort_by_distance(p)[0] for p in [
        (-0.635, -2.15, 0.95),
    ]]
    fillet(zaokr_glenie22_edges, radius=ZAOKR_GLENIE22_R)

    # Zaokrąglenie23
    zaokr_glenie23_edges = [part.edges().sort_by_distance(p)[0] for p in [
        (0.635, -2.15, 0.95),
    ]]
    fillet(zaokr_glenie23_edges, radius=ZAOKR_GLENIE23_R)

    # Zaokrąglenie24
    zaokr_glenie24_edges = [part.edges().sort_by_distance(p)[0] for p in [
        (1.905, -2.15, 0.95),
    ]]
    fillet(zaokr_glenie24_edges, radius=ZAOKR_GLENIE24_R)

    # Zaokrąglenie25
    zaokr_glenie25_edges = [part.edges().sort_by_distance(p)[0] for p in [
        (-1.905, 2.15, 0.95),
    ]]
    fillet(zaokr_glenie25_edges, radius=ZAOKR_GLENIE25_R)

    # Zaokrąglenie26
    zaokr_glenie26_edges = [part.edges().sort_by_distance(p)[0] for p in [
        (-0.635, 2.15, 0.95),
    ]]
    fillet(zaokr_glenie26_edges, radius=ZAOKR_GLENIE26_R)

    # Zaokrąglenie27
    zaokr_glenie27_edges = [part.edges().sort_by_distance(p)[0] for p in [
        (0.635, 2.15, 0.95),
    ]]
    fillet(zaokr_glenie27_edges, radius=ZAOKR_GLENIE27_R)

    # Zaokrąglenie28
    zaokr_glenie28_edges = [part.edges().sort_by_distance(p)[0] for p in [
        (1.905, 2.15, 0.95),
    ]]
    fillet(zaokr_glenie28_edges, radius=ZAOKR_GLENIE28_R)

    # Zaokrąglenie29
    zaokr_glenie29_edges = [part.edges().sort_by_distance(p)[0] for p in [
        (1.905, 2.35, 0.2),
    ]]
    fillet(zaokr_glenie29_edges, radius=ZAOKR_GLENIE29_R)

    # Zaokrąglenie30
    zaokr_glenie30_edges = [part.edges().sort_by_distance(p)[0] for p in [
        (0.635, 2.35, 0.2),
    ]]
    fillet(zaokr_glenie30_edges, radius=ZAOKR_GLENIE30_R)

    # Zaokrąglenie31
    zaokr_glenie31_edges = [part.edges().sort_by_distance(p)[0] for p in [
        (-0.635, 2.35, 0.2),
    ]]
    fillet(zaokr_glenie31_edges, radius=ZAOKR_GLENIE31_R)

    # Zaokrąglenie32
    zaokr_glenie32_edges = [part.edges().sort_by_distance(p)[0] for p in [
        (-1.905, 2.35, 0.2),
    ]]
    fillet(zaokr_glenie32_edges, radius=ZAOKR_GLENIE32_R)

    # Szkic15 → Wytnij-wyciągnięcie4 (cut)
    with BuildSketch(Plane.XY.offset(1.75)):
        with Locations((-1.7, -1.2)):
            Circle(SZKIC15_R)
    extrude(amount=-WYTNIJ_WYCI_GNI_CIE4_DEPTH, mode=Mode.SUBTRACT)

    # Zaokrąglenie33
    zaokr_glenie33_edges = [part.edges().sort_by_distance(p)[0] for p in [
        (-1.95, -1.2, 1.55),
    ]]
    fillet(zaokr_glenie33_edges, radius=ZAOKR_GLENIE33_R)


solid = part.part
